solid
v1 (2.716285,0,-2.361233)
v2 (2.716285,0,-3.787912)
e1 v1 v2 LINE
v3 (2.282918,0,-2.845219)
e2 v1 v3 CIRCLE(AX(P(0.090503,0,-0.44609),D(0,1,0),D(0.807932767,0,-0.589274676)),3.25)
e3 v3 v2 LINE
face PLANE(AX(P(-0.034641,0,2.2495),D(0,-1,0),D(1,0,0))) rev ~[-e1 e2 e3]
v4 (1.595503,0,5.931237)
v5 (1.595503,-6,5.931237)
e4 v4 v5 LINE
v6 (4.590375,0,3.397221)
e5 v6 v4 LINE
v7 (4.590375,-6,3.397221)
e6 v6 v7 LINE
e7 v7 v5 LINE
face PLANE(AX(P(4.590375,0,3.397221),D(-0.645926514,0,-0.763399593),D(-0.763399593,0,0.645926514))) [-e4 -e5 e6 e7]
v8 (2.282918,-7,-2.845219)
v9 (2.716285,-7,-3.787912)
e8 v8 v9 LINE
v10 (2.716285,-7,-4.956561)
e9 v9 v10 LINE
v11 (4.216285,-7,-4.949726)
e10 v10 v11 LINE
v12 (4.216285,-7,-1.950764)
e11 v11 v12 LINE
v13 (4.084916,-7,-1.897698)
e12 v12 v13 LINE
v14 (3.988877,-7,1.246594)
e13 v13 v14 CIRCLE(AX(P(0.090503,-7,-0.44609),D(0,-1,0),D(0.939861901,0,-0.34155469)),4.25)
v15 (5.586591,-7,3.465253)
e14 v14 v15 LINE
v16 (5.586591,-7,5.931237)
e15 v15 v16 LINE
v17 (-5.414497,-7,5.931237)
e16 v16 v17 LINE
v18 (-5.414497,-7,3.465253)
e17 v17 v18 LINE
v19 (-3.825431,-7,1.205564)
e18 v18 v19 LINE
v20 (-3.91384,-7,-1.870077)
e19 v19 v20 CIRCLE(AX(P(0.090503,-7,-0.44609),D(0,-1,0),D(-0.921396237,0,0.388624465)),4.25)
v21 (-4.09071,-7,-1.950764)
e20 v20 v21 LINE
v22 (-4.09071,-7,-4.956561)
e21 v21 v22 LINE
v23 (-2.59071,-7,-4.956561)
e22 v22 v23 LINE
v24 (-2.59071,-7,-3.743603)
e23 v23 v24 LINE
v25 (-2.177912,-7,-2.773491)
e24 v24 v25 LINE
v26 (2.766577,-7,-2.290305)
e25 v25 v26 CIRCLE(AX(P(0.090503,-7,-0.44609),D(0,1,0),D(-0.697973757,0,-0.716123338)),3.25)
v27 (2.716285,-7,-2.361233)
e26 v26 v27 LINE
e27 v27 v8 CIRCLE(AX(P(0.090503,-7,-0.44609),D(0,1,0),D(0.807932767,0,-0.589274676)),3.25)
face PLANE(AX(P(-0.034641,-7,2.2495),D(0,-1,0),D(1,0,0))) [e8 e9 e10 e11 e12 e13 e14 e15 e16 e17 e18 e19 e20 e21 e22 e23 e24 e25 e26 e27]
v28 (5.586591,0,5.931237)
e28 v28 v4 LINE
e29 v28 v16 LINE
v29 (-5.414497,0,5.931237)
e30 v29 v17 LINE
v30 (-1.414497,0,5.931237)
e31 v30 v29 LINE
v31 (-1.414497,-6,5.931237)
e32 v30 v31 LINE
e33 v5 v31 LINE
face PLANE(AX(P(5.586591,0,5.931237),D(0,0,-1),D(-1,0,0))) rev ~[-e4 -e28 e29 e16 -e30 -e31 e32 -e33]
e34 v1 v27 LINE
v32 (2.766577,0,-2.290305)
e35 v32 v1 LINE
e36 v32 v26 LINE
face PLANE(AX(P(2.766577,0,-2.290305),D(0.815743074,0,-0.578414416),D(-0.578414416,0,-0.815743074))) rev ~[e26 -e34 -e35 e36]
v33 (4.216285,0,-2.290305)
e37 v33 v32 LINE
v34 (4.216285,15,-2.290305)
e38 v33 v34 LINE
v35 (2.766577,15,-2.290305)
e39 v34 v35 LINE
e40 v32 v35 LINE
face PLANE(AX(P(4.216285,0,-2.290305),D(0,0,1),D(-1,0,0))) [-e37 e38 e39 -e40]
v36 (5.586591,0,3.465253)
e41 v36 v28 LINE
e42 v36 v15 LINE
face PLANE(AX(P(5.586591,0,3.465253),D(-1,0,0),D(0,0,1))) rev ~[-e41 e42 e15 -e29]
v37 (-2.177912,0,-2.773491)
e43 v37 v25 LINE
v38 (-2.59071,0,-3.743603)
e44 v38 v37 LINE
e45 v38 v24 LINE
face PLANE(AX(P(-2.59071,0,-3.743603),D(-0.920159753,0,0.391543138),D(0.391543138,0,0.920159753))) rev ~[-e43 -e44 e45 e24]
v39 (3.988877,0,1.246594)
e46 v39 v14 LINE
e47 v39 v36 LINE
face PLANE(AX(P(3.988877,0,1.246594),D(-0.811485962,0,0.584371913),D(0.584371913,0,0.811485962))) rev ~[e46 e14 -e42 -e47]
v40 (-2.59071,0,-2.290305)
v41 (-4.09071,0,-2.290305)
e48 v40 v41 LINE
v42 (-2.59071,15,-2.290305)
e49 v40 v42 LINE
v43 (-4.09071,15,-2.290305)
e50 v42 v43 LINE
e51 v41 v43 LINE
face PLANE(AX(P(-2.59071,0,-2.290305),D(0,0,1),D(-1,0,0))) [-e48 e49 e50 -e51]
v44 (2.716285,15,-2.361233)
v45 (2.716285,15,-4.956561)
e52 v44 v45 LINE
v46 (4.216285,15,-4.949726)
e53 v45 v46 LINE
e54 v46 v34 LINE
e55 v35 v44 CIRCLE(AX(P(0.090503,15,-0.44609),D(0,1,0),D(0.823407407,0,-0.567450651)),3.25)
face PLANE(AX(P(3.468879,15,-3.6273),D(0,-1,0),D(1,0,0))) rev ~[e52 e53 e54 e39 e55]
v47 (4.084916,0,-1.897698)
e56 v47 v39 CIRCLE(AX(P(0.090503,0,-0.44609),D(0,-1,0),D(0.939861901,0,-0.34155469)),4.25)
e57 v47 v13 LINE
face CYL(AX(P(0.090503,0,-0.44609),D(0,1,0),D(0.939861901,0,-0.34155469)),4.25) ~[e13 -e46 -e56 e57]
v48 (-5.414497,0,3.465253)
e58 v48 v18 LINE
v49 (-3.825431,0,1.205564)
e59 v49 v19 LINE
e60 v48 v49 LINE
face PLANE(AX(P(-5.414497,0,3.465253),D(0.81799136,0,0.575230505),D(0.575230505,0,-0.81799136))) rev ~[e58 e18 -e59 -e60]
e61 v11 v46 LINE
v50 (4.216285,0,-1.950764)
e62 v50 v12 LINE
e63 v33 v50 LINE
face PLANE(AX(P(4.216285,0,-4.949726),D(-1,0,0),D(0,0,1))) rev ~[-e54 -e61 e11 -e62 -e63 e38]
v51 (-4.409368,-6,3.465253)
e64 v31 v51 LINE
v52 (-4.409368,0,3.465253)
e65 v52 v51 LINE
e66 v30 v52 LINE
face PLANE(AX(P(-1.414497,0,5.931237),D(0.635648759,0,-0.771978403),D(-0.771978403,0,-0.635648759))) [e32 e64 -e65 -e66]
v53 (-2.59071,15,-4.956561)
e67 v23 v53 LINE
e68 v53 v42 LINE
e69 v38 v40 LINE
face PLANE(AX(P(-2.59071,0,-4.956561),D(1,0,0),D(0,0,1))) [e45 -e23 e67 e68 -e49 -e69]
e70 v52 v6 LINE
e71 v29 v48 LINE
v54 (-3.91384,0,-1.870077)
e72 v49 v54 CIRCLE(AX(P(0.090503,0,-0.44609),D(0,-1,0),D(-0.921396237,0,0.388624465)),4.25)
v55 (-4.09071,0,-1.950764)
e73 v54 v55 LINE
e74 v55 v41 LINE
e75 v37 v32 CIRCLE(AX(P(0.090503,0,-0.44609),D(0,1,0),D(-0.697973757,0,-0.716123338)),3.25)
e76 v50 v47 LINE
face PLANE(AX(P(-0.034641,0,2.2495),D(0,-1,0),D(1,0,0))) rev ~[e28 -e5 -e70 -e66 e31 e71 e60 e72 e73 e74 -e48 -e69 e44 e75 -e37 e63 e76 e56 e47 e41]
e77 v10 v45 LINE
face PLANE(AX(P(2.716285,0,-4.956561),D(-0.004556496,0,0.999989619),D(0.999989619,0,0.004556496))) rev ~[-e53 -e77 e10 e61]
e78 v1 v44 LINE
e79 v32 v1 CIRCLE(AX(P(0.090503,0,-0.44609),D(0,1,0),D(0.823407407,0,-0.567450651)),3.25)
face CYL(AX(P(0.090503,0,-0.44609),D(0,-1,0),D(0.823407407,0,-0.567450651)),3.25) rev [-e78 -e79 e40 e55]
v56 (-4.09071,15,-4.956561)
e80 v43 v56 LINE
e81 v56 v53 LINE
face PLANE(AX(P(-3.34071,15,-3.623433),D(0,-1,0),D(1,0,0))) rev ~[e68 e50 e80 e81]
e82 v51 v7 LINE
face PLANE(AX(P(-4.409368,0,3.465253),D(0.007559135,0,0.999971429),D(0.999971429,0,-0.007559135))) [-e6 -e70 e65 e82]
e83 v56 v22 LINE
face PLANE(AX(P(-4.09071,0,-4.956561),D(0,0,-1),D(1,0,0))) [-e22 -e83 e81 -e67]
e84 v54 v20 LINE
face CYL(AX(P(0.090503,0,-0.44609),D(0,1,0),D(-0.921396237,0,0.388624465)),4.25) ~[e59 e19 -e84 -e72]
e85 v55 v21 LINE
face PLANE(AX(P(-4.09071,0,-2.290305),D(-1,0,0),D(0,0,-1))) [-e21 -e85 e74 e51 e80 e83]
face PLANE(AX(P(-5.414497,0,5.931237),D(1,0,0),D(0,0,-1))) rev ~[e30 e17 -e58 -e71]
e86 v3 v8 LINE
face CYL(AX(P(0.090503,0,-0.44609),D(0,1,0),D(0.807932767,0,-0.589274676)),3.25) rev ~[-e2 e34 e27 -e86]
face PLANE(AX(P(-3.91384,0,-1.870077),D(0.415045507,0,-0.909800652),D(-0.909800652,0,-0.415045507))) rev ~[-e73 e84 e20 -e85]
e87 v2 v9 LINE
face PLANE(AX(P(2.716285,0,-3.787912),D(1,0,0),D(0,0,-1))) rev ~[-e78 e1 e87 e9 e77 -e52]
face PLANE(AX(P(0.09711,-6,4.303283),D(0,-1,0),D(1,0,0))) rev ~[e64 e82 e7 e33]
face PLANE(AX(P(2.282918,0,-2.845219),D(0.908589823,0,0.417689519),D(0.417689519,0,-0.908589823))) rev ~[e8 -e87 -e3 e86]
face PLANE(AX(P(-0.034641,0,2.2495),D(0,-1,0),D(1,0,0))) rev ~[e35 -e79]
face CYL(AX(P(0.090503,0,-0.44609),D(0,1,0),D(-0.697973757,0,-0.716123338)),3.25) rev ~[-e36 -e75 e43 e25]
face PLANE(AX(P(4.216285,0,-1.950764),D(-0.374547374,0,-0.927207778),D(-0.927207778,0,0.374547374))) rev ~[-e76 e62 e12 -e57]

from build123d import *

# Parameters (mm, degrees)
F1_DEPTH = 7
F2_DEPTH = 6
F3_DEPTH = 15


# Not quite as in the source:
# - a feature names something its author has since deleted; it is built from what else it names


with BuildPart() as f1:
    # F0 (on Front) → F1 (new body)
    with BuildSketch(Plane.XZ):
        with BuildLine():
            Line((-3.9138396984, -1.8700768013), (-3.3236176952, -1.6008211246))
            Line((-3.3236176952, -1.6008211246), (-3.3236176952, -2.2903047641))
            Line((-3.3236176952, -2.2903047641), (-2.590710345, -2.2903047641))
            Line((-2.590710345, -2.2903047641), (-2.590710345, -3.7436034497))
            Line((-2.590710345, -3.7436034497), (-2.1779115118, -2.7734910012))
            ThreePointArc((-2.1779115118, -2.7734910012), (-0.2255882059, 2.7885019734), (2.7665772748, -2.2903047641))
            Line((2.7665772748, -2.2903047641), (3.4491920394, -2.2903047641))
            Line((3.4491920394, -2.2903047641), (3.4491920394, -1.6408955531))
            Line((3.4491920394, -1.6408955531), (4.0849162776, -1.8976975874))
            ThreePointArc((4.0849162776, -1.8976975874), (4.3385221106, -0.3163391945), (3.988877441, 1.2465935905))
            Line((3.988877441, 1.2465935905), (5.5865912817, 3.465253188))
            Line((5.5865912817, 3.465253188), (5.5865912817, 5.931237081))
            Line((5.5865912817, 5.931237081), (1.5955031972, 5.931237081))
            Line((1.5955031972, 5.931237081), (4.5903746292, 3.397220974))
            Line((4.5903746292, 3.397220974), (0.0905031972, 3.431237081))
            Line((0.0905031972, 3.431237081), (-4.4093682348, 3.465253188))
            Line((-4.4093682348, 3.465253188), (-1.4144968028, 5.931237081))
            Line((-1.4144968028, 5.931237081), (-5.4144968028, 5.931237081))
            Line((-5.4144968028, 5.931237081), (-5.4144968028, 3.465253188))
            Line((-5.4144968028, 3.465253188), (-3.8254308087, 1.2055638243))
            ThreePointArc((-3.8254308087, 1.2055638243), (-4.1577420716, -0.3239748955), (-3.9138396984, -1.8700768013))
        make_face()
        Polygon((-3.3236176952, -2.2903047641), (-3.3236176952, -1.6008211246), (-3.9138396984, -1.8700768013), (-4.090710345, -1.9507641112), (-4.090710345, -2.2903047641), align=None)
        Polygon((-2.590710345, -2.2903047641), (-3.3236176952, -2.2903047641), (-4.090710345, -2.2903047641), (-4.090710345, -4.9565606735), (-3.3236176952, -4.9565606735), (-2.590710345, -4.9565606735), (-2.590710345, -3.7436034497), align=None)
        with BuildLine():
            Line((3.4491920394, -2.2903047641), (2.7665772748, -2.2903047641))
            ThreePointArc((2.7665772748, -2.2903047641), (2.7416681899, -2.3259370036), (2.7162846892, -2.3612328517))
            Line((2.7162846892, -2.3612328517), (2.7162846892, -3.7879117456))
            Line((2.7162846892, -3.7879117456), (2.7162846892, -4.9565606735))
            Line((2.7162846892, -4.9565606735), (4.2162846892, -4.9497258588))
            Line((4.2162846892, -4.9497258588), (4.2162846892, -2.2903047641))
            Line((4.2162846892, -2.2903047641), (3.4491920394, -2.2903047641))
        make_face()
        with BuildLine():
            ThreePointArc((2.7162846892, -2.3612328517), (2.7416681899, -2.3259370036), (2.7665772748, -2.2903047641))
            Line((2.7665772748, -2.2903047641), (2.7162846892, -2.3612328517))
        make_face()
        Polygon((1.5955031972, 5.931237081), (-1.4144968028, 5.931237081), (-4.4093682348, 3.465253188), (0.0905031972, 3.431237081), (4.5903746292, 3.397220974), align=None)
        with BuildLine():
            Line((2.7162846892, -3.7879117456), (2.7162846892, -2.3612328517))
            ThreePointArc((2.7162846892, -2.3612328517), (2.5117247114, -2.6140814767), (2.2829176272, -2.8452189465))
            Line((2.2829176272, -2.8452189465), (2.7162846892, -3.7879117456))
        make_face()
        Polygon((3.4491920394, -1.6408955531), (3.4491920394, -2.2903047641), (4.2162846892, -2.2903047641), (4.2162846892, -1.9507641112), (4.0849162776, -1.8976975874), align=None)
    extrude(amount=F1_DEPTH)

    # F0 (on Front) → F2 (cut)
    with BuildSketch(Plane.XZ):
        Polygon((1.5955031972, 5.931237081), (-1.4144968028, 5.931237081), (-4.4093682348, 3.465253188), (0.0905031972, 3.431237081), (4.5903746292, 3.397220974), align=None)
    extrude(amount=F2_DEPTH, mode=Mode.SUBTRACT)

    # F0 (on Front) → F3 (join)
    with BuildSketch(Plane.XZ):
        Polygon((-2.590710345, -2.2903047641), (-3.3236176952, -2.2903047641), (-4.090710345, -2.2903047641), (-4.090710345, -4.9565606735), (-3.3236176952, -4.9565606735), (-2.590710345, -4.9565606735), (-2.590710345, -3.7436034497), align=None)
        with BuildLine():
            Line((3.4491920394, -2.2903047641), (2.7665772748, -2.2903047641))
            ThreePointArc((2.7665772748, -2.2903047641), (2.7416681899, -2.3259370036), (2.7162846892, -2.3612328517))
            Line((2.7162846892, -2.3612328517), (2.7162846892, -3.7879117456))
            Line((2.7162846892, -3.7879117456), (2.7162846892, -4.9565606735))
            Line((2.7162846892, -4.9565606735), (4.2162846892, -4.9497258588))
            Line((4.2162846892, -4.9497258588), (4.2162846892, -2.2903047641))
            Line((4.2162846892, -2.2903047641), (3.4491920394, -2.2903047641))
        make_face()
    extrude(amount=-F3_DEPTH)


solid = f1.part
